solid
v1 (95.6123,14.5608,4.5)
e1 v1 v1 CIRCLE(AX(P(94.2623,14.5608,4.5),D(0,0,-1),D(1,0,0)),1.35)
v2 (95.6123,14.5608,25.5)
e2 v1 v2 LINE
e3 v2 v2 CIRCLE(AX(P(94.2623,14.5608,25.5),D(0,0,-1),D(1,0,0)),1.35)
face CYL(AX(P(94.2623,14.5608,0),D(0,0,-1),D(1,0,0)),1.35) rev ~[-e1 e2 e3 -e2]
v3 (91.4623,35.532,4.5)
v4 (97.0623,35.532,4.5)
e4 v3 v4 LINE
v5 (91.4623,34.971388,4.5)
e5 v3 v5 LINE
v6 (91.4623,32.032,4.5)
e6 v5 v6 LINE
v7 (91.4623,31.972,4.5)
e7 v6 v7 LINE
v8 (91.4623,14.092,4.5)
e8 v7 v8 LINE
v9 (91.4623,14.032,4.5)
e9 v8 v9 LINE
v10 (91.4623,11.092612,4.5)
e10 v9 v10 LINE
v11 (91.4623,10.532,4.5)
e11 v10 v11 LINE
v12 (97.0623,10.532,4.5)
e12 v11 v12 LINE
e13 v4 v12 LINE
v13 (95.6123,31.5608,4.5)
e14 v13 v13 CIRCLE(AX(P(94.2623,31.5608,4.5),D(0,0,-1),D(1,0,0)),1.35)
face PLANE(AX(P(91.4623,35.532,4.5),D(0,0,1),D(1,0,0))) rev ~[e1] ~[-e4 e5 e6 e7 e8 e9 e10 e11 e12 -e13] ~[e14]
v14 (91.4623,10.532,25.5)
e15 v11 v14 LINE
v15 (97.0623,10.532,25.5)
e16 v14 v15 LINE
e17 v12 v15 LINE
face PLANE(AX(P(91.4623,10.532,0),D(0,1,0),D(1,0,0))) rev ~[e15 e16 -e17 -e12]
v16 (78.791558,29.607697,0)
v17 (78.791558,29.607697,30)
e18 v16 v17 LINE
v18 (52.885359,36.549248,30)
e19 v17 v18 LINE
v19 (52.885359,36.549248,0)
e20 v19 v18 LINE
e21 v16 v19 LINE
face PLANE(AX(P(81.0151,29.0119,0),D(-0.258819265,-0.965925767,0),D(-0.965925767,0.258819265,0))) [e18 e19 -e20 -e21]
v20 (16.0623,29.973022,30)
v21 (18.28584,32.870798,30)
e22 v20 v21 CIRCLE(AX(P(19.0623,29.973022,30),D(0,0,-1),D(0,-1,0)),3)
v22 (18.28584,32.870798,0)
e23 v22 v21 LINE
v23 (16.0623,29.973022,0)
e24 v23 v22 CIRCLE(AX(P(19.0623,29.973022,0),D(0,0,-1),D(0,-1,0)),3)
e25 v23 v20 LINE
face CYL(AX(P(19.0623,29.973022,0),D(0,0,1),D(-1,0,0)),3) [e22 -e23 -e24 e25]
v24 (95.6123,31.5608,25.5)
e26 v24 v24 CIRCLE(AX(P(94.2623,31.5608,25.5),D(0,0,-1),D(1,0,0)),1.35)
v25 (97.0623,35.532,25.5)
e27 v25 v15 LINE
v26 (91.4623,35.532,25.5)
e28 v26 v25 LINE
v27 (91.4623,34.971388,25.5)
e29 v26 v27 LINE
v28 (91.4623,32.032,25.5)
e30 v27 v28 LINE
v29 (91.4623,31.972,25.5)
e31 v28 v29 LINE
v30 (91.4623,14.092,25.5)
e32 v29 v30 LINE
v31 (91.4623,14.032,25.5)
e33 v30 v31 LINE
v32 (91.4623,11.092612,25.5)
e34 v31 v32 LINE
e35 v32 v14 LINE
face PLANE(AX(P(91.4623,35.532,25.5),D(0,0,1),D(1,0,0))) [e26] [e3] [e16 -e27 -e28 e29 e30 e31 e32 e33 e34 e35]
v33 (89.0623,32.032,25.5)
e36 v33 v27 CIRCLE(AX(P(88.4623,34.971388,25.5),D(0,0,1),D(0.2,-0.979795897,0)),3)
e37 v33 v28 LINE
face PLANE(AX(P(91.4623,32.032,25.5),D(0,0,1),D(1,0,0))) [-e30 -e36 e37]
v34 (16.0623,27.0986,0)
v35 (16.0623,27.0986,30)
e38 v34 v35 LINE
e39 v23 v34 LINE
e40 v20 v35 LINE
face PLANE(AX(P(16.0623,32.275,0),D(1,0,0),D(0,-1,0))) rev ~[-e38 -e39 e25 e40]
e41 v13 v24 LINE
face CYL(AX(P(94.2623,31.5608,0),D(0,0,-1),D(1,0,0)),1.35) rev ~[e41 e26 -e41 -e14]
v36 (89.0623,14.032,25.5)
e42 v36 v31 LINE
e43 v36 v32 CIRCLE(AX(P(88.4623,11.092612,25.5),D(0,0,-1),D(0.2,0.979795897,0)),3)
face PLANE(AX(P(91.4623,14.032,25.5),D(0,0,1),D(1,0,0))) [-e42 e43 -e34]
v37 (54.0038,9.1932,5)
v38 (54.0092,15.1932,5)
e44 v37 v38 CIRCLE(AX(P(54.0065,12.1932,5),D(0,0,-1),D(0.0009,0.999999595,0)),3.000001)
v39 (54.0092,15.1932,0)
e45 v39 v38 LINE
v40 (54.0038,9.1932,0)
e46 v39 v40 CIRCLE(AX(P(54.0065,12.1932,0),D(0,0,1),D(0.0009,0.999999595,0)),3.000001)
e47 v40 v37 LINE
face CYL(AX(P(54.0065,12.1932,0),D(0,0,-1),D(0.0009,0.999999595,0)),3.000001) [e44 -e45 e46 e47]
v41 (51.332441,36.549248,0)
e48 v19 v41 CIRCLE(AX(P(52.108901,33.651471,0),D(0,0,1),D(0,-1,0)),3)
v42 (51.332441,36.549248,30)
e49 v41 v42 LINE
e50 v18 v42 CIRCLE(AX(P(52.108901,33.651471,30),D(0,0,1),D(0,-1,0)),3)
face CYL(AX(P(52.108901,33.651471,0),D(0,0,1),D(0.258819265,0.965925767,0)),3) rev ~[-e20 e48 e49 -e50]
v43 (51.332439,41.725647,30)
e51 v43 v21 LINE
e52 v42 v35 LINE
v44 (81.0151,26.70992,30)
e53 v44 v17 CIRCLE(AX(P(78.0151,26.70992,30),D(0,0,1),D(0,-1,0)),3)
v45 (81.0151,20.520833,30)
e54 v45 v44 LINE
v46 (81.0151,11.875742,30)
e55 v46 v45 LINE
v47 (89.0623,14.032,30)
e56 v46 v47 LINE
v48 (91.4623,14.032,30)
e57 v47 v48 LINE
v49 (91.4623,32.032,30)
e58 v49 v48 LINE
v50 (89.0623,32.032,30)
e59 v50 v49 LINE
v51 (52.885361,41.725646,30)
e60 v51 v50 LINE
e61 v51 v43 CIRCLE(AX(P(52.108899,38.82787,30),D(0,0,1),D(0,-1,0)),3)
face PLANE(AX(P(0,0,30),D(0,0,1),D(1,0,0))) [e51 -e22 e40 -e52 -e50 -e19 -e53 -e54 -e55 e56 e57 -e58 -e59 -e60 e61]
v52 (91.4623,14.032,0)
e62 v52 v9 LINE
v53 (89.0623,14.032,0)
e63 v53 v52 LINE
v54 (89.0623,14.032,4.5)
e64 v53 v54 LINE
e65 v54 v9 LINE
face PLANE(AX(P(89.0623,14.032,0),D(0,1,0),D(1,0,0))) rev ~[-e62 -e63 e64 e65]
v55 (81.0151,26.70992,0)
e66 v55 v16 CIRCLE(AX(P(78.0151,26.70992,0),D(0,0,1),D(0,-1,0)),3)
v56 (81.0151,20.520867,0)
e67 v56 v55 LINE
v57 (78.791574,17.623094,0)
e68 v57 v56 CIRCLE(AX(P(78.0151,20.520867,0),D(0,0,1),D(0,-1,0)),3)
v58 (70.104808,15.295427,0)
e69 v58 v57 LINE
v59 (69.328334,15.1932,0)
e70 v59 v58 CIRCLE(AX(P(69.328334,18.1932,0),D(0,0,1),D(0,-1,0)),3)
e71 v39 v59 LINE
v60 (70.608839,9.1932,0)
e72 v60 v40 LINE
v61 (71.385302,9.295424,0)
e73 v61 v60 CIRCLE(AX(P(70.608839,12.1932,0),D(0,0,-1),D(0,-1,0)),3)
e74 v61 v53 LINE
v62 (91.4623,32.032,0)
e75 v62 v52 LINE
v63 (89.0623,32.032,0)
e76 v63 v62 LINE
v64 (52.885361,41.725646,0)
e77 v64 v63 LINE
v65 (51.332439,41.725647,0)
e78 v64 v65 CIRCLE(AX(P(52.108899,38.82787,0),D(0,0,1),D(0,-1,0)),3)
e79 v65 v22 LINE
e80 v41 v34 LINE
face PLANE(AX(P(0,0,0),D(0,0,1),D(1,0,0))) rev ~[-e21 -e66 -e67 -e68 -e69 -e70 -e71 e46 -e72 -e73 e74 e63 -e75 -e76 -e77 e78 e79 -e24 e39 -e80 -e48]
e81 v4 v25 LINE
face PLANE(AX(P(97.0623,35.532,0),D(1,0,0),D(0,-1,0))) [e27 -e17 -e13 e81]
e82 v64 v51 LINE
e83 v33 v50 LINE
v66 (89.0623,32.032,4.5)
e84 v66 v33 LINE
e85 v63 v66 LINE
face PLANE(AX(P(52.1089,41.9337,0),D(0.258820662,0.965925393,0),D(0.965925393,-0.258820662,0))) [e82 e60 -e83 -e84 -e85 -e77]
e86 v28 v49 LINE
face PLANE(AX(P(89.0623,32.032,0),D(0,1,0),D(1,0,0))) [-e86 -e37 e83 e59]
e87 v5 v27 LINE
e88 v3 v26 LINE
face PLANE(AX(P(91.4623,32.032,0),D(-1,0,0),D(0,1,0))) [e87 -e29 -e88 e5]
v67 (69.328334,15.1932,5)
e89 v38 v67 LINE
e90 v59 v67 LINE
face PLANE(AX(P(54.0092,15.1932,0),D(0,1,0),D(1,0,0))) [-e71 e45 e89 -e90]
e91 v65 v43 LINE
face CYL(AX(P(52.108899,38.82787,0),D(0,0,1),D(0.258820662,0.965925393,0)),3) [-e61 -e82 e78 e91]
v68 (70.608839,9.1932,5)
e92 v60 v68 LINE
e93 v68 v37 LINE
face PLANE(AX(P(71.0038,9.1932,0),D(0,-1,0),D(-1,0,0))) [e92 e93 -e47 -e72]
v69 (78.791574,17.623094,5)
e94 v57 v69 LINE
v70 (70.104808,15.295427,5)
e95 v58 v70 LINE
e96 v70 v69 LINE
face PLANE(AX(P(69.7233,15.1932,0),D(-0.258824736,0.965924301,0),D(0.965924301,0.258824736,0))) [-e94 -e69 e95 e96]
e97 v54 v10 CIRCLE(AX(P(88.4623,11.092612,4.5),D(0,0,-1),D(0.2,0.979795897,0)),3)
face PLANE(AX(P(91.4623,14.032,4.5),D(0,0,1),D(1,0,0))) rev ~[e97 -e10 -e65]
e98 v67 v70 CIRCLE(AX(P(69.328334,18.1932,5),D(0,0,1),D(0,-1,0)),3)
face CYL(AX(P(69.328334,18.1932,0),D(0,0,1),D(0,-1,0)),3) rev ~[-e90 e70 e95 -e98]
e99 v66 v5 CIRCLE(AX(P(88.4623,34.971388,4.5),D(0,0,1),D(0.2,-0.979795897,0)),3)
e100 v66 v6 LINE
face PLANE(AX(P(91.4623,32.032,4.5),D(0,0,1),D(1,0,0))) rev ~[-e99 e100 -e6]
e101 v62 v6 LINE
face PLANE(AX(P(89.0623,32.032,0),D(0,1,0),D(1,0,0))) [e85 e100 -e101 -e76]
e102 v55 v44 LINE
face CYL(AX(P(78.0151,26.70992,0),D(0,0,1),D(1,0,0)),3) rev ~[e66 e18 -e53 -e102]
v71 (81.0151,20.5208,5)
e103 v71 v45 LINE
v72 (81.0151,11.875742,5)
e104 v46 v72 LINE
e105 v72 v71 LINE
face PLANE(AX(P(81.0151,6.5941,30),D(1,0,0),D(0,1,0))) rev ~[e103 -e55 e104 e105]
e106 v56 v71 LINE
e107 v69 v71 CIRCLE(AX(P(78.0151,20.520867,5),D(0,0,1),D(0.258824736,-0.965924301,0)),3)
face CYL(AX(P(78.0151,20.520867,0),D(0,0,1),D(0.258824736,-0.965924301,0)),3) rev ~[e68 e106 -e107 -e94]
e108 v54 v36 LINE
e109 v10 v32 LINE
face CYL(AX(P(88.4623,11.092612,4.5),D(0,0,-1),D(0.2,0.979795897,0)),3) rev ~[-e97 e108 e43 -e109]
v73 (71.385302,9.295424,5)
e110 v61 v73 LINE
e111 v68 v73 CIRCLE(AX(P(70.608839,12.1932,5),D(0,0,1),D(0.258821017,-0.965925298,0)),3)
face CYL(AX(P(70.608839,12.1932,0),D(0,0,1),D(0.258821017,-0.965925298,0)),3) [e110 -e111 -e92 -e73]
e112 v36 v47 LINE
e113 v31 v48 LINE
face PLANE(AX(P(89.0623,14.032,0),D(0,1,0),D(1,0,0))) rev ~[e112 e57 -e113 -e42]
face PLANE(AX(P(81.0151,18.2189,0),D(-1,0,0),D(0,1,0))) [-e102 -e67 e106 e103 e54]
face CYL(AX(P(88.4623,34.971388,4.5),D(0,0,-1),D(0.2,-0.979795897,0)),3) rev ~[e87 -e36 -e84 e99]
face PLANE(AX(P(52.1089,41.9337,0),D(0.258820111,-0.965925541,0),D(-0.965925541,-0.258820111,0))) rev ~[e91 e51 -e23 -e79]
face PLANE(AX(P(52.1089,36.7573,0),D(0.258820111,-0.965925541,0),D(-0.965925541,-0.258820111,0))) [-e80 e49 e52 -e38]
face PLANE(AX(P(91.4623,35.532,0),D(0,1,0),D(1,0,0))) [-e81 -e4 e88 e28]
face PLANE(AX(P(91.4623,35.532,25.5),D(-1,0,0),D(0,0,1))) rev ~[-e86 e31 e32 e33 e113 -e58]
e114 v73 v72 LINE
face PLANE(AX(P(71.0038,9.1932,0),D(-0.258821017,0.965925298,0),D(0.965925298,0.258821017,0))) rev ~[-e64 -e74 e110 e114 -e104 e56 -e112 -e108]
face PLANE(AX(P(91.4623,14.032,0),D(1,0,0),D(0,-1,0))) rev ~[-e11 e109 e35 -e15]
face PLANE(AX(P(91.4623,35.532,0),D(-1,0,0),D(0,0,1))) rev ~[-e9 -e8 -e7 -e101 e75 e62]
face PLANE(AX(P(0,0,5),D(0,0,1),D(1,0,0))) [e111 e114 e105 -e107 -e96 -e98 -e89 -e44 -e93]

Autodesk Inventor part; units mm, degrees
ref_plane "YZ Plane" through (0, 0, 0) normal (1, 0, 0) x (0, 1, 0)
ref_plane "XZ Plane" through (0, 0, 0) normal (0, 1, 0) x (-1, 0, 0)
ref_plane "XY Plane" through (0, 0, 0) normal (0, 0, 1) x (1, 0, 0)
sketch "Sketch1" plane through (0, 0, 0) normal (0, 0, 1) x (1, 0, 0)
  line L0 (52.1089, 41.9337) -> (16.0623, 32.275)
  line L1 (81.0151, 18.2189) -> (81.0151, 29.0119)
  line L2 (81.0151, 29.0119) -> (52.1089, 36.7573)
  line L3 (52.1089, 36.7573) -> (16.0623, 27.0986)
  line L4 (16.0623, 32.275) -> (16.0623, 27.0986)
  line L5 (71.0038, 9.1932) -> (89.0623, 14.032)
  line L6 (71.0038, 9.1932) -> (54.0038, 9.1932)
  line L7 (54.0092, 15.1932) -> (69.7233, 15.1932)
  arc A0 (54.0092, 15.1932) -> (54.0038, 9.1932) centre (54.0065, 12.1932) ccw
  line L8 (69.7233, 15.1932) -> (81.0151, 18.2189)
  line L9 (52.1089, 41.9337) -> (89.0623, 32.032)
  line L10 (97.0623, 35.532) -> (97.0623, 10.532)
  circle A1 centre (94.2623, 31.5608) radius 1.35 projected
  circle A2 centre (94.2623, 14.5608) radius 1.35 projected
  line L11 (89.0623, 32.032) -> (91.4623, 32.032)
  line L12 (91.4623, 32.032) -> (91.4623, 35.532)
  line L13 (91.4623, 35.532) -> (97.0623, 35.532)
  line L14 (89.0623, 14.032) -> (91.4623, 14.032)
  line L15 (91.4623, 14.032) -> (91.4623, 10.532)
  line L16 (91.4623, 10.532) -> (97.0623, 10.532)
  point P0 (0, 0)
  dimension "d0" = 5
  dimension "d1" = 6
  dimension "d2" = 5
  dimension "d3" = 75
  dimension "d4" = 150
  dimension "d5" = 18
  dimension "d6" = 15
  dimension "d28" = 25
  dimension "d30" = 5.6
  dimension "d31" = 5.6
extrude "Extrusion1" add sketch "Sketch1" along normal blind 30
fillet "Fillet1" radius 3 7 edges at (81.0151, 29.0119, 15) (81.0151, 18.2189, 15) (69.7233, 15.1932, 15) (52.1089, 36.7573, 15) (52.1089, 41.9337, 15) (16.0623, 32.275, 15) (71.0038, 9.1932, 15)
sketch "Sketch7" plane through (0, 0, 30) normal (0, 0, 1) x (1, 0, 0)
  line L0 (81.0151, 20.5208) -> (47.1738, 20.5208)
  line L1 (47.1738, 20.5208) -> (47.1738, 6.5941)
  line L2 (47.1738, 6.5941) -> (81.0151, 6.5941)
  line L3 (81.0151, 6.5941) -> (81.0151, 20.5208)
  point P0 (0, 0)
extrude "Extrusion6" cut sketch "Sketch7" against normal blind 25
sketch "Sketch6" plane through (91.4623, 35.532, 0) normal (0, 1, 0) x (1, 0, 0)
  line L0 (0, 0) -> (0, -30) projected
  line L1 (5.6, 0) -> (0, 0)
  line L2 (0, 0) -> (0, -4.5)
  line L3 (0, -4.5) -> (5.6, -4.5)
  line L4 (5.6, -4.5) -> (5.6, 0)
  line L5 (5.6, -30) -> (0, -30)
  line L6 (0, -30) -> (0, -25.5)
  line L7 (0, -25.5) -> (5.6, -25.5)
  line L8 (5.6, -25.5) -> (5.6, -30)
  point P0 (-91.4623, 0)
  dimension "d32" = 4.5
  dimension "d33" = 5.6
  dimension "d34" = 4.5
extrude "Extrusion5" cut sketch "Sketch6" against normal through all
fillet "Fillet2" radius 3 2 edges at (91.4623, 14.032, 15) (91.4623, 32.032, 15)
properties part number "Left Hand" material "Aluminum-6061"
